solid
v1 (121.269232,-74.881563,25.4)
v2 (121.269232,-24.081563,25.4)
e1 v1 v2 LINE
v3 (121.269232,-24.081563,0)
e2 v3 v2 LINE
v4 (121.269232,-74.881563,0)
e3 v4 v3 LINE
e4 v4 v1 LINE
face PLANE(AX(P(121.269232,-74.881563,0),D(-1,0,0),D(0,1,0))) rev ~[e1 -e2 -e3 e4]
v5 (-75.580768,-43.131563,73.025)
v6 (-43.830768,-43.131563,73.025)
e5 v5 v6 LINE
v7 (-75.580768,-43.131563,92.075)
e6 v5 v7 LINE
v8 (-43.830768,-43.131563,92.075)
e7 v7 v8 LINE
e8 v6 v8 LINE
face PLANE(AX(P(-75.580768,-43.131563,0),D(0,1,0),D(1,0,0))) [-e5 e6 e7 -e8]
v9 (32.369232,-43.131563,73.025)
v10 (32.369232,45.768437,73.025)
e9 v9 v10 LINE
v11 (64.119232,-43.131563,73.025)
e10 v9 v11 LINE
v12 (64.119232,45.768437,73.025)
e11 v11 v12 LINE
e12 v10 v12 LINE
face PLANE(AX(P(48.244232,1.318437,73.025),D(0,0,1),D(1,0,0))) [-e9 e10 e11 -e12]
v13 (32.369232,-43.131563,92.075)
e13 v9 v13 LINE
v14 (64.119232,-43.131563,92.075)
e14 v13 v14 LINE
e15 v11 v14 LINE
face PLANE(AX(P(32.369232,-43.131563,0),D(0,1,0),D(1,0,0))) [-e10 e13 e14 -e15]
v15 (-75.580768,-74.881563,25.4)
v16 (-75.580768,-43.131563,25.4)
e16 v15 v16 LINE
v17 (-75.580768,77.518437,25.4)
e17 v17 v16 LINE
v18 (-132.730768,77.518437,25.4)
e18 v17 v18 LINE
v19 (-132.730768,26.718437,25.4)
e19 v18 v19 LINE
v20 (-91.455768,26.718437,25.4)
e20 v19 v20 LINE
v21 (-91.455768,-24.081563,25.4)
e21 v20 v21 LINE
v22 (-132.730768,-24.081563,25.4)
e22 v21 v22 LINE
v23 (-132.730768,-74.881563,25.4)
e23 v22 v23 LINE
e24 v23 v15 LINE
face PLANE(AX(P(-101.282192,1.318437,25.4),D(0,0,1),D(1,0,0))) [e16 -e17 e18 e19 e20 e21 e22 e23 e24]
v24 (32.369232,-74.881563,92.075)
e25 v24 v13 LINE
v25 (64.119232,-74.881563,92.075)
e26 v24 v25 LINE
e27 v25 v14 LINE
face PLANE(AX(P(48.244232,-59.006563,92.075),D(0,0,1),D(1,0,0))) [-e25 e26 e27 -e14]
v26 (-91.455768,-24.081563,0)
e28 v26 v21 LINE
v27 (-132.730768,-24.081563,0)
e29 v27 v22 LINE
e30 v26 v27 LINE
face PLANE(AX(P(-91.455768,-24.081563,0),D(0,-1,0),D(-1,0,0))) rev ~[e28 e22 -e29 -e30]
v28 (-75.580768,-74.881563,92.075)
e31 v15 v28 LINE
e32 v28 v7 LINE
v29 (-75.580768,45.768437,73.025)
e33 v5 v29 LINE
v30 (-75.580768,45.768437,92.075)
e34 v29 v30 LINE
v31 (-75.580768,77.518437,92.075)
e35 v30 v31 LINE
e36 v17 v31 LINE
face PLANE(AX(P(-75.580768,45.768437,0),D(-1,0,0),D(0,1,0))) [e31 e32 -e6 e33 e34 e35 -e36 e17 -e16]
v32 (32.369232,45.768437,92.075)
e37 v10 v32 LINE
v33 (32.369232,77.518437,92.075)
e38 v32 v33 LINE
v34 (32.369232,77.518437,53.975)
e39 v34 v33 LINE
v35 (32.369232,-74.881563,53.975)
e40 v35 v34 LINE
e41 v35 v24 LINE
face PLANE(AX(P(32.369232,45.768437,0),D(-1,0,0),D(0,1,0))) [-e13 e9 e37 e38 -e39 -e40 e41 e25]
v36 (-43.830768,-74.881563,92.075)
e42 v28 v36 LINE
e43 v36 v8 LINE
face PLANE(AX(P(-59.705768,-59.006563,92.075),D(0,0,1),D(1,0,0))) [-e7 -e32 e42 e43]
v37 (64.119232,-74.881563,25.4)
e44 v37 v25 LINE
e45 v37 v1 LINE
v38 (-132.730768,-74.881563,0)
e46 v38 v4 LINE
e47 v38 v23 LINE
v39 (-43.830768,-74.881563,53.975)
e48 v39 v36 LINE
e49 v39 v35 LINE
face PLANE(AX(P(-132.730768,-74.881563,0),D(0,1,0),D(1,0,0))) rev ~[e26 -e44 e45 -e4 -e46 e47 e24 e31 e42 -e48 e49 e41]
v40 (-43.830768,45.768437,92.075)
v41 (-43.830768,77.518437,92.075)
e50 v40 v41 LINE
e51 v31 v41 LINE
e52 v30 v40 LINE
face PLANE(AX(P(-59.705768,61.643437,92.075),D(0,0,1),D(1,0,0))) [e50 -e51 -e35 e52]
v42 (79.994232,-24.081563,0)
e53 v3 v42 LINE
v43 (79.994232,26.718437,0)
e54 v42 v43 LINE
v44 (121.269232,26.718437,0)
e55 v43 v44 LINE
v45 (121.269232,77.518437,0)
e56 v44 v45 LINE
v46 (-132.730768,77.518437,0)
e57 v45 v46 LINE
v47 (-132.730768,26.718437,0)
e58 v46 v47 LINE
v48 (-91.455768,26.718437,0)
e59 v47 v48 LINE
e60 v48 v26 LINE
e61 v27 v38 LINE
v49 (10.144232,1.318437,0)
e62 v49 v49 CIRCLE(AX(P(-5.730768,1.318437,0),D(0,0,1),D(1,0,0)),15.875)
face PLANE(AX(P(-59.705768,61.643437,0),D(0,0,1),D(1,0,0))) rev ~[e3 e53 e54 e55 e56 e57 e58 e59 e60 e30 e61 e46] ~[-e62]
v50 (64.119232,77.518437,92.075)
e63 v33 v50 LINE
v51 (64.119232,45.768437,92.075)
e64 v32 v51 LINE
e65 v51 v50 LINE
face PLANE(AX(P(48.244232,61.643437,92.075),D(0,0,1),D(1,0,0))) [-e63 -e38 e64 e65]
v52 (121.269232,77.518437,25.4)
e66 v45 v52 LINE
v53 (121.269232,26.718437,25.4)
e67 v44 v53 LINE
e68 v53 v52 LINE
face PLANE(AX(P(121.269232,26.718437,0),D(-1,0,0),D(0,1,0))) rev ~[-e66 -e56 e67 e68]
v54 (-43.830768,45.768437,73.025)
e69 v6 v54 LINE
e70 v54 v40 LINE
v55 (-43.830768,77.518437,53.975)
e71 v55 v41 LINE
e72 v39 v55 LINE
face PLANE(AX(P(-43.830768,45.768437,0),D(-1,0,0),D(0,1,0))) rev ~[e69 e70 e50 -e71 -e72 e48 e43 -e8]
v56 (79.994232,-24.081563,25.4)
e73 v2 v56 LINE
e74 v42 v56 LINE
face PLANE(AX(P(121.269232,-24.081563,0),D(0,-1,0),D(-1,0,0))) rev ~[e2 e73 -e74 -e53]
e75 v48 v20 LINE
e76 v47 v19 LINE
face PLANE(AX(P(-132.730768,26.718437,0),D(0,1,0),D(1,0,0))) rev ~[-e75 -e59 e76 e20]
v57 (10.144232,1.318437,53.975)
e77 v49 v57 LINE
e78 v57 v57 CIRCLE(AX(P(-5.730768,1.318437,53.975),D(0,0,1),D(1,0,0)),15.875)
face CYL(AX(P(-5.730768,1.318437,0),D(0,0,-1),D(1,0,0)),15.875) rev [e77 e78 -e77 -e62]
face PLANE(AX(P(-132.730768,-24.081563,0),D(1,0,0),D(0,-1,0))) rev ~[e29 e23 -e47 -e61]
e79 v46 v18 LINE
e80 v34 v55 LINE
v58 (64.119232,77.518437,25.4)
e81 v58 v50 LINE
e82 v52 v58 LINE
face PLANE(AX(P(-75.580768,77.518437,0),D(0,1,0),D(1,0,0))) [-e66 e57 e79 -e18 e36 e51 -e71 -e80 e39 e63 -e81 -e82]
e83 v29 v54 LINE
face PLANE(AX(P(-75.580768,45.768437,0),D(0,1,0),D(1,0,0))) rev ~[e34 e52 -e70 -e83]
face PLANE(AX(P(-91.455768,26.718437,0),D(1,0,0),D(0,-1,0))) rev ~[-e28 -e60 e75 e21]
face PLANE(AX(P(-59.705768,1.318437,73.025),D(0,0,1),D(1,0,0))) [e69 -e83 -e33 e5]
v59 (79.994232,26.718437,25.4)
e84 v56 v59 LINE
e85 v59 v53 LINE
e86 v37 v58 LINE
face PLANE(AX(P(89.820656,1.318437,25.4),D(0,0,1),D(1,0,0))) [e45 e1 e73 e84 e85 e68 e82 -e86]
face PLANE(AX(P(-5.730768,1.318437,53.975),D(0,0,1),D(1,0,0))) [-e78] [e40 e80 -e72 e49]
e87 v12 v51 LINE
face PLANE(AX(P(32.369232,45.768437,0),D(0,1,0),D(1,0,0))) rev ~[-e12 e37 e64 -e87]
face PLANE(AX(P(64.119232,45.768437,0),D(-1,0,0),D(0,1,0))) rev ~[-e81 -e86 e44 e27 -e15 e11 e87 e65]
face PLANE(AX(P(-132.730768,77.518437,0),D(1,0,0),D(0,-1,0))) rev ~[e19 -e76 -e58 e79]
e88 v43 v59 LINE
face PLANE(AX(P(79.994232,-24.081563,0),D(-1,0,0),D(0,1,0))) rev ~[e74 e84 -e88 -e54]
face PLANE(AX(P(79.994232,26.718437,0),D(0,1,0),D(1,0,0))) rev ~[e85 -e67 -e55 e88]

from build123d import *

# Parameters (mm, degrees)
F1_DEPTH = 25.4
F0_R     = 15.875
F2_DEPTH = 53.975
F0_W     = 31.75
F0_H     = 88.9
F3_DEPTH = 73.025
F0_H_2   = 31.75
F4_DEPTH = 92.075


# Not quite as in the source:
# - a feature names something its author has since deleted; it is built from what else it names


with BuildPart() as f1:
    # F0 (on Top) → F1 (new body)
    with BuildSketch(Plane.XY):
        Polygon((-75.5807677343, 77.5184368145), (-132.7307677343, 77.5184368145), (-132.7307677343, 26.7184368145), (-91.4557677343, 26.7184368145), (-91.4557677343, -24.0815631855), (-132.7307677343, -24.0815631855), (-132.7307677343, -74.8815631855), (-75.5807677344, -74.8815631855), (-75.5807677343, -43.1315631855), (-75.5807677343, 45.7684368145), align=None)
    extrude(amount=F1_DEPTH)



with BuildPart() as f1b:
    # F0 (on Top) → F1, piece 2 (new body)
    with BuildSketch(Plane.XY):
        Polygon((121.2692322657, 77.5184368145), (64.1192322657, 77.5184368145), (64.1192322657, 45.7684368145), (64.1192322657, -43.1315631855), (64.1192322657, -74.8815631855), (121.2692322657, -74.8815631855), (121.2692322657, -24.0815631855), (79.9942322657, -24.0815631855), (79.9942322657, 26.7184368145), (121.2692322657, 26.7184368145), align=None)
    extrude(amount=F1_DEPTH)


with BuildPart() as f2:
    # F0 (on Top) → F2 (new body)
    with BuildSketch(Plane.XY):
        Polygon((32.3692322657, 77.5184368145), (-43.8307677343, 77.5184368145), (-43.8307677343, 45.7684368145), (-43.8307677343, -43.1315631855), (-43.8307677343, -74.8815631855), (32.3692322657, -74.8815631855), (32.3692322657, -43.1315631855), (32.3692322657, 45.7684368145), align=None)
        with Locations((-5.7307677343, 1.3184368145)):
            Circle(F0_R, mode=Mode.SUBTRACT)
    extrude(amount=F2_DEPTH)


with BuildPart() as f1_1:
    add(f1.part)

    add(f1b.part)  # F3 merges F1b

    add(f2.part)  # F3 merges F2
    # F0 (on Top) → F3 (join)
    with BuildSketch(Plane.XY):
        with Locations((-59.7057677343, 1.3184368145)):
            Rectangle(F0_W, F0_H)
        with Locations((48.2442322657, 1.3184368145)):
            Rectangle(F0_W, F0_H)
    extrude(amount=F3_DEPTH)

    # F0 (on Top) → F4 (join)
    with BuildSketch(Plane.XY):
        with Locations((-59.7057677343, 61.6434368145)):
            Rectangle(F0_W, F0_H_2)
        with Locations((48.2442322657, 61.6434368145)):
            Rectangle(F0_W, F0_H_2)
        with Locations((-59.7057677343, -59.0065631855)):
            Rectangle(F0_W, F0_H_2)
        with Locations((48.2442322657, -59.0065631855)):
            Rectangle(F0_W, F0_H_2)
    extrude(amount=F4_DEPTH)


solid = f1_1.part
